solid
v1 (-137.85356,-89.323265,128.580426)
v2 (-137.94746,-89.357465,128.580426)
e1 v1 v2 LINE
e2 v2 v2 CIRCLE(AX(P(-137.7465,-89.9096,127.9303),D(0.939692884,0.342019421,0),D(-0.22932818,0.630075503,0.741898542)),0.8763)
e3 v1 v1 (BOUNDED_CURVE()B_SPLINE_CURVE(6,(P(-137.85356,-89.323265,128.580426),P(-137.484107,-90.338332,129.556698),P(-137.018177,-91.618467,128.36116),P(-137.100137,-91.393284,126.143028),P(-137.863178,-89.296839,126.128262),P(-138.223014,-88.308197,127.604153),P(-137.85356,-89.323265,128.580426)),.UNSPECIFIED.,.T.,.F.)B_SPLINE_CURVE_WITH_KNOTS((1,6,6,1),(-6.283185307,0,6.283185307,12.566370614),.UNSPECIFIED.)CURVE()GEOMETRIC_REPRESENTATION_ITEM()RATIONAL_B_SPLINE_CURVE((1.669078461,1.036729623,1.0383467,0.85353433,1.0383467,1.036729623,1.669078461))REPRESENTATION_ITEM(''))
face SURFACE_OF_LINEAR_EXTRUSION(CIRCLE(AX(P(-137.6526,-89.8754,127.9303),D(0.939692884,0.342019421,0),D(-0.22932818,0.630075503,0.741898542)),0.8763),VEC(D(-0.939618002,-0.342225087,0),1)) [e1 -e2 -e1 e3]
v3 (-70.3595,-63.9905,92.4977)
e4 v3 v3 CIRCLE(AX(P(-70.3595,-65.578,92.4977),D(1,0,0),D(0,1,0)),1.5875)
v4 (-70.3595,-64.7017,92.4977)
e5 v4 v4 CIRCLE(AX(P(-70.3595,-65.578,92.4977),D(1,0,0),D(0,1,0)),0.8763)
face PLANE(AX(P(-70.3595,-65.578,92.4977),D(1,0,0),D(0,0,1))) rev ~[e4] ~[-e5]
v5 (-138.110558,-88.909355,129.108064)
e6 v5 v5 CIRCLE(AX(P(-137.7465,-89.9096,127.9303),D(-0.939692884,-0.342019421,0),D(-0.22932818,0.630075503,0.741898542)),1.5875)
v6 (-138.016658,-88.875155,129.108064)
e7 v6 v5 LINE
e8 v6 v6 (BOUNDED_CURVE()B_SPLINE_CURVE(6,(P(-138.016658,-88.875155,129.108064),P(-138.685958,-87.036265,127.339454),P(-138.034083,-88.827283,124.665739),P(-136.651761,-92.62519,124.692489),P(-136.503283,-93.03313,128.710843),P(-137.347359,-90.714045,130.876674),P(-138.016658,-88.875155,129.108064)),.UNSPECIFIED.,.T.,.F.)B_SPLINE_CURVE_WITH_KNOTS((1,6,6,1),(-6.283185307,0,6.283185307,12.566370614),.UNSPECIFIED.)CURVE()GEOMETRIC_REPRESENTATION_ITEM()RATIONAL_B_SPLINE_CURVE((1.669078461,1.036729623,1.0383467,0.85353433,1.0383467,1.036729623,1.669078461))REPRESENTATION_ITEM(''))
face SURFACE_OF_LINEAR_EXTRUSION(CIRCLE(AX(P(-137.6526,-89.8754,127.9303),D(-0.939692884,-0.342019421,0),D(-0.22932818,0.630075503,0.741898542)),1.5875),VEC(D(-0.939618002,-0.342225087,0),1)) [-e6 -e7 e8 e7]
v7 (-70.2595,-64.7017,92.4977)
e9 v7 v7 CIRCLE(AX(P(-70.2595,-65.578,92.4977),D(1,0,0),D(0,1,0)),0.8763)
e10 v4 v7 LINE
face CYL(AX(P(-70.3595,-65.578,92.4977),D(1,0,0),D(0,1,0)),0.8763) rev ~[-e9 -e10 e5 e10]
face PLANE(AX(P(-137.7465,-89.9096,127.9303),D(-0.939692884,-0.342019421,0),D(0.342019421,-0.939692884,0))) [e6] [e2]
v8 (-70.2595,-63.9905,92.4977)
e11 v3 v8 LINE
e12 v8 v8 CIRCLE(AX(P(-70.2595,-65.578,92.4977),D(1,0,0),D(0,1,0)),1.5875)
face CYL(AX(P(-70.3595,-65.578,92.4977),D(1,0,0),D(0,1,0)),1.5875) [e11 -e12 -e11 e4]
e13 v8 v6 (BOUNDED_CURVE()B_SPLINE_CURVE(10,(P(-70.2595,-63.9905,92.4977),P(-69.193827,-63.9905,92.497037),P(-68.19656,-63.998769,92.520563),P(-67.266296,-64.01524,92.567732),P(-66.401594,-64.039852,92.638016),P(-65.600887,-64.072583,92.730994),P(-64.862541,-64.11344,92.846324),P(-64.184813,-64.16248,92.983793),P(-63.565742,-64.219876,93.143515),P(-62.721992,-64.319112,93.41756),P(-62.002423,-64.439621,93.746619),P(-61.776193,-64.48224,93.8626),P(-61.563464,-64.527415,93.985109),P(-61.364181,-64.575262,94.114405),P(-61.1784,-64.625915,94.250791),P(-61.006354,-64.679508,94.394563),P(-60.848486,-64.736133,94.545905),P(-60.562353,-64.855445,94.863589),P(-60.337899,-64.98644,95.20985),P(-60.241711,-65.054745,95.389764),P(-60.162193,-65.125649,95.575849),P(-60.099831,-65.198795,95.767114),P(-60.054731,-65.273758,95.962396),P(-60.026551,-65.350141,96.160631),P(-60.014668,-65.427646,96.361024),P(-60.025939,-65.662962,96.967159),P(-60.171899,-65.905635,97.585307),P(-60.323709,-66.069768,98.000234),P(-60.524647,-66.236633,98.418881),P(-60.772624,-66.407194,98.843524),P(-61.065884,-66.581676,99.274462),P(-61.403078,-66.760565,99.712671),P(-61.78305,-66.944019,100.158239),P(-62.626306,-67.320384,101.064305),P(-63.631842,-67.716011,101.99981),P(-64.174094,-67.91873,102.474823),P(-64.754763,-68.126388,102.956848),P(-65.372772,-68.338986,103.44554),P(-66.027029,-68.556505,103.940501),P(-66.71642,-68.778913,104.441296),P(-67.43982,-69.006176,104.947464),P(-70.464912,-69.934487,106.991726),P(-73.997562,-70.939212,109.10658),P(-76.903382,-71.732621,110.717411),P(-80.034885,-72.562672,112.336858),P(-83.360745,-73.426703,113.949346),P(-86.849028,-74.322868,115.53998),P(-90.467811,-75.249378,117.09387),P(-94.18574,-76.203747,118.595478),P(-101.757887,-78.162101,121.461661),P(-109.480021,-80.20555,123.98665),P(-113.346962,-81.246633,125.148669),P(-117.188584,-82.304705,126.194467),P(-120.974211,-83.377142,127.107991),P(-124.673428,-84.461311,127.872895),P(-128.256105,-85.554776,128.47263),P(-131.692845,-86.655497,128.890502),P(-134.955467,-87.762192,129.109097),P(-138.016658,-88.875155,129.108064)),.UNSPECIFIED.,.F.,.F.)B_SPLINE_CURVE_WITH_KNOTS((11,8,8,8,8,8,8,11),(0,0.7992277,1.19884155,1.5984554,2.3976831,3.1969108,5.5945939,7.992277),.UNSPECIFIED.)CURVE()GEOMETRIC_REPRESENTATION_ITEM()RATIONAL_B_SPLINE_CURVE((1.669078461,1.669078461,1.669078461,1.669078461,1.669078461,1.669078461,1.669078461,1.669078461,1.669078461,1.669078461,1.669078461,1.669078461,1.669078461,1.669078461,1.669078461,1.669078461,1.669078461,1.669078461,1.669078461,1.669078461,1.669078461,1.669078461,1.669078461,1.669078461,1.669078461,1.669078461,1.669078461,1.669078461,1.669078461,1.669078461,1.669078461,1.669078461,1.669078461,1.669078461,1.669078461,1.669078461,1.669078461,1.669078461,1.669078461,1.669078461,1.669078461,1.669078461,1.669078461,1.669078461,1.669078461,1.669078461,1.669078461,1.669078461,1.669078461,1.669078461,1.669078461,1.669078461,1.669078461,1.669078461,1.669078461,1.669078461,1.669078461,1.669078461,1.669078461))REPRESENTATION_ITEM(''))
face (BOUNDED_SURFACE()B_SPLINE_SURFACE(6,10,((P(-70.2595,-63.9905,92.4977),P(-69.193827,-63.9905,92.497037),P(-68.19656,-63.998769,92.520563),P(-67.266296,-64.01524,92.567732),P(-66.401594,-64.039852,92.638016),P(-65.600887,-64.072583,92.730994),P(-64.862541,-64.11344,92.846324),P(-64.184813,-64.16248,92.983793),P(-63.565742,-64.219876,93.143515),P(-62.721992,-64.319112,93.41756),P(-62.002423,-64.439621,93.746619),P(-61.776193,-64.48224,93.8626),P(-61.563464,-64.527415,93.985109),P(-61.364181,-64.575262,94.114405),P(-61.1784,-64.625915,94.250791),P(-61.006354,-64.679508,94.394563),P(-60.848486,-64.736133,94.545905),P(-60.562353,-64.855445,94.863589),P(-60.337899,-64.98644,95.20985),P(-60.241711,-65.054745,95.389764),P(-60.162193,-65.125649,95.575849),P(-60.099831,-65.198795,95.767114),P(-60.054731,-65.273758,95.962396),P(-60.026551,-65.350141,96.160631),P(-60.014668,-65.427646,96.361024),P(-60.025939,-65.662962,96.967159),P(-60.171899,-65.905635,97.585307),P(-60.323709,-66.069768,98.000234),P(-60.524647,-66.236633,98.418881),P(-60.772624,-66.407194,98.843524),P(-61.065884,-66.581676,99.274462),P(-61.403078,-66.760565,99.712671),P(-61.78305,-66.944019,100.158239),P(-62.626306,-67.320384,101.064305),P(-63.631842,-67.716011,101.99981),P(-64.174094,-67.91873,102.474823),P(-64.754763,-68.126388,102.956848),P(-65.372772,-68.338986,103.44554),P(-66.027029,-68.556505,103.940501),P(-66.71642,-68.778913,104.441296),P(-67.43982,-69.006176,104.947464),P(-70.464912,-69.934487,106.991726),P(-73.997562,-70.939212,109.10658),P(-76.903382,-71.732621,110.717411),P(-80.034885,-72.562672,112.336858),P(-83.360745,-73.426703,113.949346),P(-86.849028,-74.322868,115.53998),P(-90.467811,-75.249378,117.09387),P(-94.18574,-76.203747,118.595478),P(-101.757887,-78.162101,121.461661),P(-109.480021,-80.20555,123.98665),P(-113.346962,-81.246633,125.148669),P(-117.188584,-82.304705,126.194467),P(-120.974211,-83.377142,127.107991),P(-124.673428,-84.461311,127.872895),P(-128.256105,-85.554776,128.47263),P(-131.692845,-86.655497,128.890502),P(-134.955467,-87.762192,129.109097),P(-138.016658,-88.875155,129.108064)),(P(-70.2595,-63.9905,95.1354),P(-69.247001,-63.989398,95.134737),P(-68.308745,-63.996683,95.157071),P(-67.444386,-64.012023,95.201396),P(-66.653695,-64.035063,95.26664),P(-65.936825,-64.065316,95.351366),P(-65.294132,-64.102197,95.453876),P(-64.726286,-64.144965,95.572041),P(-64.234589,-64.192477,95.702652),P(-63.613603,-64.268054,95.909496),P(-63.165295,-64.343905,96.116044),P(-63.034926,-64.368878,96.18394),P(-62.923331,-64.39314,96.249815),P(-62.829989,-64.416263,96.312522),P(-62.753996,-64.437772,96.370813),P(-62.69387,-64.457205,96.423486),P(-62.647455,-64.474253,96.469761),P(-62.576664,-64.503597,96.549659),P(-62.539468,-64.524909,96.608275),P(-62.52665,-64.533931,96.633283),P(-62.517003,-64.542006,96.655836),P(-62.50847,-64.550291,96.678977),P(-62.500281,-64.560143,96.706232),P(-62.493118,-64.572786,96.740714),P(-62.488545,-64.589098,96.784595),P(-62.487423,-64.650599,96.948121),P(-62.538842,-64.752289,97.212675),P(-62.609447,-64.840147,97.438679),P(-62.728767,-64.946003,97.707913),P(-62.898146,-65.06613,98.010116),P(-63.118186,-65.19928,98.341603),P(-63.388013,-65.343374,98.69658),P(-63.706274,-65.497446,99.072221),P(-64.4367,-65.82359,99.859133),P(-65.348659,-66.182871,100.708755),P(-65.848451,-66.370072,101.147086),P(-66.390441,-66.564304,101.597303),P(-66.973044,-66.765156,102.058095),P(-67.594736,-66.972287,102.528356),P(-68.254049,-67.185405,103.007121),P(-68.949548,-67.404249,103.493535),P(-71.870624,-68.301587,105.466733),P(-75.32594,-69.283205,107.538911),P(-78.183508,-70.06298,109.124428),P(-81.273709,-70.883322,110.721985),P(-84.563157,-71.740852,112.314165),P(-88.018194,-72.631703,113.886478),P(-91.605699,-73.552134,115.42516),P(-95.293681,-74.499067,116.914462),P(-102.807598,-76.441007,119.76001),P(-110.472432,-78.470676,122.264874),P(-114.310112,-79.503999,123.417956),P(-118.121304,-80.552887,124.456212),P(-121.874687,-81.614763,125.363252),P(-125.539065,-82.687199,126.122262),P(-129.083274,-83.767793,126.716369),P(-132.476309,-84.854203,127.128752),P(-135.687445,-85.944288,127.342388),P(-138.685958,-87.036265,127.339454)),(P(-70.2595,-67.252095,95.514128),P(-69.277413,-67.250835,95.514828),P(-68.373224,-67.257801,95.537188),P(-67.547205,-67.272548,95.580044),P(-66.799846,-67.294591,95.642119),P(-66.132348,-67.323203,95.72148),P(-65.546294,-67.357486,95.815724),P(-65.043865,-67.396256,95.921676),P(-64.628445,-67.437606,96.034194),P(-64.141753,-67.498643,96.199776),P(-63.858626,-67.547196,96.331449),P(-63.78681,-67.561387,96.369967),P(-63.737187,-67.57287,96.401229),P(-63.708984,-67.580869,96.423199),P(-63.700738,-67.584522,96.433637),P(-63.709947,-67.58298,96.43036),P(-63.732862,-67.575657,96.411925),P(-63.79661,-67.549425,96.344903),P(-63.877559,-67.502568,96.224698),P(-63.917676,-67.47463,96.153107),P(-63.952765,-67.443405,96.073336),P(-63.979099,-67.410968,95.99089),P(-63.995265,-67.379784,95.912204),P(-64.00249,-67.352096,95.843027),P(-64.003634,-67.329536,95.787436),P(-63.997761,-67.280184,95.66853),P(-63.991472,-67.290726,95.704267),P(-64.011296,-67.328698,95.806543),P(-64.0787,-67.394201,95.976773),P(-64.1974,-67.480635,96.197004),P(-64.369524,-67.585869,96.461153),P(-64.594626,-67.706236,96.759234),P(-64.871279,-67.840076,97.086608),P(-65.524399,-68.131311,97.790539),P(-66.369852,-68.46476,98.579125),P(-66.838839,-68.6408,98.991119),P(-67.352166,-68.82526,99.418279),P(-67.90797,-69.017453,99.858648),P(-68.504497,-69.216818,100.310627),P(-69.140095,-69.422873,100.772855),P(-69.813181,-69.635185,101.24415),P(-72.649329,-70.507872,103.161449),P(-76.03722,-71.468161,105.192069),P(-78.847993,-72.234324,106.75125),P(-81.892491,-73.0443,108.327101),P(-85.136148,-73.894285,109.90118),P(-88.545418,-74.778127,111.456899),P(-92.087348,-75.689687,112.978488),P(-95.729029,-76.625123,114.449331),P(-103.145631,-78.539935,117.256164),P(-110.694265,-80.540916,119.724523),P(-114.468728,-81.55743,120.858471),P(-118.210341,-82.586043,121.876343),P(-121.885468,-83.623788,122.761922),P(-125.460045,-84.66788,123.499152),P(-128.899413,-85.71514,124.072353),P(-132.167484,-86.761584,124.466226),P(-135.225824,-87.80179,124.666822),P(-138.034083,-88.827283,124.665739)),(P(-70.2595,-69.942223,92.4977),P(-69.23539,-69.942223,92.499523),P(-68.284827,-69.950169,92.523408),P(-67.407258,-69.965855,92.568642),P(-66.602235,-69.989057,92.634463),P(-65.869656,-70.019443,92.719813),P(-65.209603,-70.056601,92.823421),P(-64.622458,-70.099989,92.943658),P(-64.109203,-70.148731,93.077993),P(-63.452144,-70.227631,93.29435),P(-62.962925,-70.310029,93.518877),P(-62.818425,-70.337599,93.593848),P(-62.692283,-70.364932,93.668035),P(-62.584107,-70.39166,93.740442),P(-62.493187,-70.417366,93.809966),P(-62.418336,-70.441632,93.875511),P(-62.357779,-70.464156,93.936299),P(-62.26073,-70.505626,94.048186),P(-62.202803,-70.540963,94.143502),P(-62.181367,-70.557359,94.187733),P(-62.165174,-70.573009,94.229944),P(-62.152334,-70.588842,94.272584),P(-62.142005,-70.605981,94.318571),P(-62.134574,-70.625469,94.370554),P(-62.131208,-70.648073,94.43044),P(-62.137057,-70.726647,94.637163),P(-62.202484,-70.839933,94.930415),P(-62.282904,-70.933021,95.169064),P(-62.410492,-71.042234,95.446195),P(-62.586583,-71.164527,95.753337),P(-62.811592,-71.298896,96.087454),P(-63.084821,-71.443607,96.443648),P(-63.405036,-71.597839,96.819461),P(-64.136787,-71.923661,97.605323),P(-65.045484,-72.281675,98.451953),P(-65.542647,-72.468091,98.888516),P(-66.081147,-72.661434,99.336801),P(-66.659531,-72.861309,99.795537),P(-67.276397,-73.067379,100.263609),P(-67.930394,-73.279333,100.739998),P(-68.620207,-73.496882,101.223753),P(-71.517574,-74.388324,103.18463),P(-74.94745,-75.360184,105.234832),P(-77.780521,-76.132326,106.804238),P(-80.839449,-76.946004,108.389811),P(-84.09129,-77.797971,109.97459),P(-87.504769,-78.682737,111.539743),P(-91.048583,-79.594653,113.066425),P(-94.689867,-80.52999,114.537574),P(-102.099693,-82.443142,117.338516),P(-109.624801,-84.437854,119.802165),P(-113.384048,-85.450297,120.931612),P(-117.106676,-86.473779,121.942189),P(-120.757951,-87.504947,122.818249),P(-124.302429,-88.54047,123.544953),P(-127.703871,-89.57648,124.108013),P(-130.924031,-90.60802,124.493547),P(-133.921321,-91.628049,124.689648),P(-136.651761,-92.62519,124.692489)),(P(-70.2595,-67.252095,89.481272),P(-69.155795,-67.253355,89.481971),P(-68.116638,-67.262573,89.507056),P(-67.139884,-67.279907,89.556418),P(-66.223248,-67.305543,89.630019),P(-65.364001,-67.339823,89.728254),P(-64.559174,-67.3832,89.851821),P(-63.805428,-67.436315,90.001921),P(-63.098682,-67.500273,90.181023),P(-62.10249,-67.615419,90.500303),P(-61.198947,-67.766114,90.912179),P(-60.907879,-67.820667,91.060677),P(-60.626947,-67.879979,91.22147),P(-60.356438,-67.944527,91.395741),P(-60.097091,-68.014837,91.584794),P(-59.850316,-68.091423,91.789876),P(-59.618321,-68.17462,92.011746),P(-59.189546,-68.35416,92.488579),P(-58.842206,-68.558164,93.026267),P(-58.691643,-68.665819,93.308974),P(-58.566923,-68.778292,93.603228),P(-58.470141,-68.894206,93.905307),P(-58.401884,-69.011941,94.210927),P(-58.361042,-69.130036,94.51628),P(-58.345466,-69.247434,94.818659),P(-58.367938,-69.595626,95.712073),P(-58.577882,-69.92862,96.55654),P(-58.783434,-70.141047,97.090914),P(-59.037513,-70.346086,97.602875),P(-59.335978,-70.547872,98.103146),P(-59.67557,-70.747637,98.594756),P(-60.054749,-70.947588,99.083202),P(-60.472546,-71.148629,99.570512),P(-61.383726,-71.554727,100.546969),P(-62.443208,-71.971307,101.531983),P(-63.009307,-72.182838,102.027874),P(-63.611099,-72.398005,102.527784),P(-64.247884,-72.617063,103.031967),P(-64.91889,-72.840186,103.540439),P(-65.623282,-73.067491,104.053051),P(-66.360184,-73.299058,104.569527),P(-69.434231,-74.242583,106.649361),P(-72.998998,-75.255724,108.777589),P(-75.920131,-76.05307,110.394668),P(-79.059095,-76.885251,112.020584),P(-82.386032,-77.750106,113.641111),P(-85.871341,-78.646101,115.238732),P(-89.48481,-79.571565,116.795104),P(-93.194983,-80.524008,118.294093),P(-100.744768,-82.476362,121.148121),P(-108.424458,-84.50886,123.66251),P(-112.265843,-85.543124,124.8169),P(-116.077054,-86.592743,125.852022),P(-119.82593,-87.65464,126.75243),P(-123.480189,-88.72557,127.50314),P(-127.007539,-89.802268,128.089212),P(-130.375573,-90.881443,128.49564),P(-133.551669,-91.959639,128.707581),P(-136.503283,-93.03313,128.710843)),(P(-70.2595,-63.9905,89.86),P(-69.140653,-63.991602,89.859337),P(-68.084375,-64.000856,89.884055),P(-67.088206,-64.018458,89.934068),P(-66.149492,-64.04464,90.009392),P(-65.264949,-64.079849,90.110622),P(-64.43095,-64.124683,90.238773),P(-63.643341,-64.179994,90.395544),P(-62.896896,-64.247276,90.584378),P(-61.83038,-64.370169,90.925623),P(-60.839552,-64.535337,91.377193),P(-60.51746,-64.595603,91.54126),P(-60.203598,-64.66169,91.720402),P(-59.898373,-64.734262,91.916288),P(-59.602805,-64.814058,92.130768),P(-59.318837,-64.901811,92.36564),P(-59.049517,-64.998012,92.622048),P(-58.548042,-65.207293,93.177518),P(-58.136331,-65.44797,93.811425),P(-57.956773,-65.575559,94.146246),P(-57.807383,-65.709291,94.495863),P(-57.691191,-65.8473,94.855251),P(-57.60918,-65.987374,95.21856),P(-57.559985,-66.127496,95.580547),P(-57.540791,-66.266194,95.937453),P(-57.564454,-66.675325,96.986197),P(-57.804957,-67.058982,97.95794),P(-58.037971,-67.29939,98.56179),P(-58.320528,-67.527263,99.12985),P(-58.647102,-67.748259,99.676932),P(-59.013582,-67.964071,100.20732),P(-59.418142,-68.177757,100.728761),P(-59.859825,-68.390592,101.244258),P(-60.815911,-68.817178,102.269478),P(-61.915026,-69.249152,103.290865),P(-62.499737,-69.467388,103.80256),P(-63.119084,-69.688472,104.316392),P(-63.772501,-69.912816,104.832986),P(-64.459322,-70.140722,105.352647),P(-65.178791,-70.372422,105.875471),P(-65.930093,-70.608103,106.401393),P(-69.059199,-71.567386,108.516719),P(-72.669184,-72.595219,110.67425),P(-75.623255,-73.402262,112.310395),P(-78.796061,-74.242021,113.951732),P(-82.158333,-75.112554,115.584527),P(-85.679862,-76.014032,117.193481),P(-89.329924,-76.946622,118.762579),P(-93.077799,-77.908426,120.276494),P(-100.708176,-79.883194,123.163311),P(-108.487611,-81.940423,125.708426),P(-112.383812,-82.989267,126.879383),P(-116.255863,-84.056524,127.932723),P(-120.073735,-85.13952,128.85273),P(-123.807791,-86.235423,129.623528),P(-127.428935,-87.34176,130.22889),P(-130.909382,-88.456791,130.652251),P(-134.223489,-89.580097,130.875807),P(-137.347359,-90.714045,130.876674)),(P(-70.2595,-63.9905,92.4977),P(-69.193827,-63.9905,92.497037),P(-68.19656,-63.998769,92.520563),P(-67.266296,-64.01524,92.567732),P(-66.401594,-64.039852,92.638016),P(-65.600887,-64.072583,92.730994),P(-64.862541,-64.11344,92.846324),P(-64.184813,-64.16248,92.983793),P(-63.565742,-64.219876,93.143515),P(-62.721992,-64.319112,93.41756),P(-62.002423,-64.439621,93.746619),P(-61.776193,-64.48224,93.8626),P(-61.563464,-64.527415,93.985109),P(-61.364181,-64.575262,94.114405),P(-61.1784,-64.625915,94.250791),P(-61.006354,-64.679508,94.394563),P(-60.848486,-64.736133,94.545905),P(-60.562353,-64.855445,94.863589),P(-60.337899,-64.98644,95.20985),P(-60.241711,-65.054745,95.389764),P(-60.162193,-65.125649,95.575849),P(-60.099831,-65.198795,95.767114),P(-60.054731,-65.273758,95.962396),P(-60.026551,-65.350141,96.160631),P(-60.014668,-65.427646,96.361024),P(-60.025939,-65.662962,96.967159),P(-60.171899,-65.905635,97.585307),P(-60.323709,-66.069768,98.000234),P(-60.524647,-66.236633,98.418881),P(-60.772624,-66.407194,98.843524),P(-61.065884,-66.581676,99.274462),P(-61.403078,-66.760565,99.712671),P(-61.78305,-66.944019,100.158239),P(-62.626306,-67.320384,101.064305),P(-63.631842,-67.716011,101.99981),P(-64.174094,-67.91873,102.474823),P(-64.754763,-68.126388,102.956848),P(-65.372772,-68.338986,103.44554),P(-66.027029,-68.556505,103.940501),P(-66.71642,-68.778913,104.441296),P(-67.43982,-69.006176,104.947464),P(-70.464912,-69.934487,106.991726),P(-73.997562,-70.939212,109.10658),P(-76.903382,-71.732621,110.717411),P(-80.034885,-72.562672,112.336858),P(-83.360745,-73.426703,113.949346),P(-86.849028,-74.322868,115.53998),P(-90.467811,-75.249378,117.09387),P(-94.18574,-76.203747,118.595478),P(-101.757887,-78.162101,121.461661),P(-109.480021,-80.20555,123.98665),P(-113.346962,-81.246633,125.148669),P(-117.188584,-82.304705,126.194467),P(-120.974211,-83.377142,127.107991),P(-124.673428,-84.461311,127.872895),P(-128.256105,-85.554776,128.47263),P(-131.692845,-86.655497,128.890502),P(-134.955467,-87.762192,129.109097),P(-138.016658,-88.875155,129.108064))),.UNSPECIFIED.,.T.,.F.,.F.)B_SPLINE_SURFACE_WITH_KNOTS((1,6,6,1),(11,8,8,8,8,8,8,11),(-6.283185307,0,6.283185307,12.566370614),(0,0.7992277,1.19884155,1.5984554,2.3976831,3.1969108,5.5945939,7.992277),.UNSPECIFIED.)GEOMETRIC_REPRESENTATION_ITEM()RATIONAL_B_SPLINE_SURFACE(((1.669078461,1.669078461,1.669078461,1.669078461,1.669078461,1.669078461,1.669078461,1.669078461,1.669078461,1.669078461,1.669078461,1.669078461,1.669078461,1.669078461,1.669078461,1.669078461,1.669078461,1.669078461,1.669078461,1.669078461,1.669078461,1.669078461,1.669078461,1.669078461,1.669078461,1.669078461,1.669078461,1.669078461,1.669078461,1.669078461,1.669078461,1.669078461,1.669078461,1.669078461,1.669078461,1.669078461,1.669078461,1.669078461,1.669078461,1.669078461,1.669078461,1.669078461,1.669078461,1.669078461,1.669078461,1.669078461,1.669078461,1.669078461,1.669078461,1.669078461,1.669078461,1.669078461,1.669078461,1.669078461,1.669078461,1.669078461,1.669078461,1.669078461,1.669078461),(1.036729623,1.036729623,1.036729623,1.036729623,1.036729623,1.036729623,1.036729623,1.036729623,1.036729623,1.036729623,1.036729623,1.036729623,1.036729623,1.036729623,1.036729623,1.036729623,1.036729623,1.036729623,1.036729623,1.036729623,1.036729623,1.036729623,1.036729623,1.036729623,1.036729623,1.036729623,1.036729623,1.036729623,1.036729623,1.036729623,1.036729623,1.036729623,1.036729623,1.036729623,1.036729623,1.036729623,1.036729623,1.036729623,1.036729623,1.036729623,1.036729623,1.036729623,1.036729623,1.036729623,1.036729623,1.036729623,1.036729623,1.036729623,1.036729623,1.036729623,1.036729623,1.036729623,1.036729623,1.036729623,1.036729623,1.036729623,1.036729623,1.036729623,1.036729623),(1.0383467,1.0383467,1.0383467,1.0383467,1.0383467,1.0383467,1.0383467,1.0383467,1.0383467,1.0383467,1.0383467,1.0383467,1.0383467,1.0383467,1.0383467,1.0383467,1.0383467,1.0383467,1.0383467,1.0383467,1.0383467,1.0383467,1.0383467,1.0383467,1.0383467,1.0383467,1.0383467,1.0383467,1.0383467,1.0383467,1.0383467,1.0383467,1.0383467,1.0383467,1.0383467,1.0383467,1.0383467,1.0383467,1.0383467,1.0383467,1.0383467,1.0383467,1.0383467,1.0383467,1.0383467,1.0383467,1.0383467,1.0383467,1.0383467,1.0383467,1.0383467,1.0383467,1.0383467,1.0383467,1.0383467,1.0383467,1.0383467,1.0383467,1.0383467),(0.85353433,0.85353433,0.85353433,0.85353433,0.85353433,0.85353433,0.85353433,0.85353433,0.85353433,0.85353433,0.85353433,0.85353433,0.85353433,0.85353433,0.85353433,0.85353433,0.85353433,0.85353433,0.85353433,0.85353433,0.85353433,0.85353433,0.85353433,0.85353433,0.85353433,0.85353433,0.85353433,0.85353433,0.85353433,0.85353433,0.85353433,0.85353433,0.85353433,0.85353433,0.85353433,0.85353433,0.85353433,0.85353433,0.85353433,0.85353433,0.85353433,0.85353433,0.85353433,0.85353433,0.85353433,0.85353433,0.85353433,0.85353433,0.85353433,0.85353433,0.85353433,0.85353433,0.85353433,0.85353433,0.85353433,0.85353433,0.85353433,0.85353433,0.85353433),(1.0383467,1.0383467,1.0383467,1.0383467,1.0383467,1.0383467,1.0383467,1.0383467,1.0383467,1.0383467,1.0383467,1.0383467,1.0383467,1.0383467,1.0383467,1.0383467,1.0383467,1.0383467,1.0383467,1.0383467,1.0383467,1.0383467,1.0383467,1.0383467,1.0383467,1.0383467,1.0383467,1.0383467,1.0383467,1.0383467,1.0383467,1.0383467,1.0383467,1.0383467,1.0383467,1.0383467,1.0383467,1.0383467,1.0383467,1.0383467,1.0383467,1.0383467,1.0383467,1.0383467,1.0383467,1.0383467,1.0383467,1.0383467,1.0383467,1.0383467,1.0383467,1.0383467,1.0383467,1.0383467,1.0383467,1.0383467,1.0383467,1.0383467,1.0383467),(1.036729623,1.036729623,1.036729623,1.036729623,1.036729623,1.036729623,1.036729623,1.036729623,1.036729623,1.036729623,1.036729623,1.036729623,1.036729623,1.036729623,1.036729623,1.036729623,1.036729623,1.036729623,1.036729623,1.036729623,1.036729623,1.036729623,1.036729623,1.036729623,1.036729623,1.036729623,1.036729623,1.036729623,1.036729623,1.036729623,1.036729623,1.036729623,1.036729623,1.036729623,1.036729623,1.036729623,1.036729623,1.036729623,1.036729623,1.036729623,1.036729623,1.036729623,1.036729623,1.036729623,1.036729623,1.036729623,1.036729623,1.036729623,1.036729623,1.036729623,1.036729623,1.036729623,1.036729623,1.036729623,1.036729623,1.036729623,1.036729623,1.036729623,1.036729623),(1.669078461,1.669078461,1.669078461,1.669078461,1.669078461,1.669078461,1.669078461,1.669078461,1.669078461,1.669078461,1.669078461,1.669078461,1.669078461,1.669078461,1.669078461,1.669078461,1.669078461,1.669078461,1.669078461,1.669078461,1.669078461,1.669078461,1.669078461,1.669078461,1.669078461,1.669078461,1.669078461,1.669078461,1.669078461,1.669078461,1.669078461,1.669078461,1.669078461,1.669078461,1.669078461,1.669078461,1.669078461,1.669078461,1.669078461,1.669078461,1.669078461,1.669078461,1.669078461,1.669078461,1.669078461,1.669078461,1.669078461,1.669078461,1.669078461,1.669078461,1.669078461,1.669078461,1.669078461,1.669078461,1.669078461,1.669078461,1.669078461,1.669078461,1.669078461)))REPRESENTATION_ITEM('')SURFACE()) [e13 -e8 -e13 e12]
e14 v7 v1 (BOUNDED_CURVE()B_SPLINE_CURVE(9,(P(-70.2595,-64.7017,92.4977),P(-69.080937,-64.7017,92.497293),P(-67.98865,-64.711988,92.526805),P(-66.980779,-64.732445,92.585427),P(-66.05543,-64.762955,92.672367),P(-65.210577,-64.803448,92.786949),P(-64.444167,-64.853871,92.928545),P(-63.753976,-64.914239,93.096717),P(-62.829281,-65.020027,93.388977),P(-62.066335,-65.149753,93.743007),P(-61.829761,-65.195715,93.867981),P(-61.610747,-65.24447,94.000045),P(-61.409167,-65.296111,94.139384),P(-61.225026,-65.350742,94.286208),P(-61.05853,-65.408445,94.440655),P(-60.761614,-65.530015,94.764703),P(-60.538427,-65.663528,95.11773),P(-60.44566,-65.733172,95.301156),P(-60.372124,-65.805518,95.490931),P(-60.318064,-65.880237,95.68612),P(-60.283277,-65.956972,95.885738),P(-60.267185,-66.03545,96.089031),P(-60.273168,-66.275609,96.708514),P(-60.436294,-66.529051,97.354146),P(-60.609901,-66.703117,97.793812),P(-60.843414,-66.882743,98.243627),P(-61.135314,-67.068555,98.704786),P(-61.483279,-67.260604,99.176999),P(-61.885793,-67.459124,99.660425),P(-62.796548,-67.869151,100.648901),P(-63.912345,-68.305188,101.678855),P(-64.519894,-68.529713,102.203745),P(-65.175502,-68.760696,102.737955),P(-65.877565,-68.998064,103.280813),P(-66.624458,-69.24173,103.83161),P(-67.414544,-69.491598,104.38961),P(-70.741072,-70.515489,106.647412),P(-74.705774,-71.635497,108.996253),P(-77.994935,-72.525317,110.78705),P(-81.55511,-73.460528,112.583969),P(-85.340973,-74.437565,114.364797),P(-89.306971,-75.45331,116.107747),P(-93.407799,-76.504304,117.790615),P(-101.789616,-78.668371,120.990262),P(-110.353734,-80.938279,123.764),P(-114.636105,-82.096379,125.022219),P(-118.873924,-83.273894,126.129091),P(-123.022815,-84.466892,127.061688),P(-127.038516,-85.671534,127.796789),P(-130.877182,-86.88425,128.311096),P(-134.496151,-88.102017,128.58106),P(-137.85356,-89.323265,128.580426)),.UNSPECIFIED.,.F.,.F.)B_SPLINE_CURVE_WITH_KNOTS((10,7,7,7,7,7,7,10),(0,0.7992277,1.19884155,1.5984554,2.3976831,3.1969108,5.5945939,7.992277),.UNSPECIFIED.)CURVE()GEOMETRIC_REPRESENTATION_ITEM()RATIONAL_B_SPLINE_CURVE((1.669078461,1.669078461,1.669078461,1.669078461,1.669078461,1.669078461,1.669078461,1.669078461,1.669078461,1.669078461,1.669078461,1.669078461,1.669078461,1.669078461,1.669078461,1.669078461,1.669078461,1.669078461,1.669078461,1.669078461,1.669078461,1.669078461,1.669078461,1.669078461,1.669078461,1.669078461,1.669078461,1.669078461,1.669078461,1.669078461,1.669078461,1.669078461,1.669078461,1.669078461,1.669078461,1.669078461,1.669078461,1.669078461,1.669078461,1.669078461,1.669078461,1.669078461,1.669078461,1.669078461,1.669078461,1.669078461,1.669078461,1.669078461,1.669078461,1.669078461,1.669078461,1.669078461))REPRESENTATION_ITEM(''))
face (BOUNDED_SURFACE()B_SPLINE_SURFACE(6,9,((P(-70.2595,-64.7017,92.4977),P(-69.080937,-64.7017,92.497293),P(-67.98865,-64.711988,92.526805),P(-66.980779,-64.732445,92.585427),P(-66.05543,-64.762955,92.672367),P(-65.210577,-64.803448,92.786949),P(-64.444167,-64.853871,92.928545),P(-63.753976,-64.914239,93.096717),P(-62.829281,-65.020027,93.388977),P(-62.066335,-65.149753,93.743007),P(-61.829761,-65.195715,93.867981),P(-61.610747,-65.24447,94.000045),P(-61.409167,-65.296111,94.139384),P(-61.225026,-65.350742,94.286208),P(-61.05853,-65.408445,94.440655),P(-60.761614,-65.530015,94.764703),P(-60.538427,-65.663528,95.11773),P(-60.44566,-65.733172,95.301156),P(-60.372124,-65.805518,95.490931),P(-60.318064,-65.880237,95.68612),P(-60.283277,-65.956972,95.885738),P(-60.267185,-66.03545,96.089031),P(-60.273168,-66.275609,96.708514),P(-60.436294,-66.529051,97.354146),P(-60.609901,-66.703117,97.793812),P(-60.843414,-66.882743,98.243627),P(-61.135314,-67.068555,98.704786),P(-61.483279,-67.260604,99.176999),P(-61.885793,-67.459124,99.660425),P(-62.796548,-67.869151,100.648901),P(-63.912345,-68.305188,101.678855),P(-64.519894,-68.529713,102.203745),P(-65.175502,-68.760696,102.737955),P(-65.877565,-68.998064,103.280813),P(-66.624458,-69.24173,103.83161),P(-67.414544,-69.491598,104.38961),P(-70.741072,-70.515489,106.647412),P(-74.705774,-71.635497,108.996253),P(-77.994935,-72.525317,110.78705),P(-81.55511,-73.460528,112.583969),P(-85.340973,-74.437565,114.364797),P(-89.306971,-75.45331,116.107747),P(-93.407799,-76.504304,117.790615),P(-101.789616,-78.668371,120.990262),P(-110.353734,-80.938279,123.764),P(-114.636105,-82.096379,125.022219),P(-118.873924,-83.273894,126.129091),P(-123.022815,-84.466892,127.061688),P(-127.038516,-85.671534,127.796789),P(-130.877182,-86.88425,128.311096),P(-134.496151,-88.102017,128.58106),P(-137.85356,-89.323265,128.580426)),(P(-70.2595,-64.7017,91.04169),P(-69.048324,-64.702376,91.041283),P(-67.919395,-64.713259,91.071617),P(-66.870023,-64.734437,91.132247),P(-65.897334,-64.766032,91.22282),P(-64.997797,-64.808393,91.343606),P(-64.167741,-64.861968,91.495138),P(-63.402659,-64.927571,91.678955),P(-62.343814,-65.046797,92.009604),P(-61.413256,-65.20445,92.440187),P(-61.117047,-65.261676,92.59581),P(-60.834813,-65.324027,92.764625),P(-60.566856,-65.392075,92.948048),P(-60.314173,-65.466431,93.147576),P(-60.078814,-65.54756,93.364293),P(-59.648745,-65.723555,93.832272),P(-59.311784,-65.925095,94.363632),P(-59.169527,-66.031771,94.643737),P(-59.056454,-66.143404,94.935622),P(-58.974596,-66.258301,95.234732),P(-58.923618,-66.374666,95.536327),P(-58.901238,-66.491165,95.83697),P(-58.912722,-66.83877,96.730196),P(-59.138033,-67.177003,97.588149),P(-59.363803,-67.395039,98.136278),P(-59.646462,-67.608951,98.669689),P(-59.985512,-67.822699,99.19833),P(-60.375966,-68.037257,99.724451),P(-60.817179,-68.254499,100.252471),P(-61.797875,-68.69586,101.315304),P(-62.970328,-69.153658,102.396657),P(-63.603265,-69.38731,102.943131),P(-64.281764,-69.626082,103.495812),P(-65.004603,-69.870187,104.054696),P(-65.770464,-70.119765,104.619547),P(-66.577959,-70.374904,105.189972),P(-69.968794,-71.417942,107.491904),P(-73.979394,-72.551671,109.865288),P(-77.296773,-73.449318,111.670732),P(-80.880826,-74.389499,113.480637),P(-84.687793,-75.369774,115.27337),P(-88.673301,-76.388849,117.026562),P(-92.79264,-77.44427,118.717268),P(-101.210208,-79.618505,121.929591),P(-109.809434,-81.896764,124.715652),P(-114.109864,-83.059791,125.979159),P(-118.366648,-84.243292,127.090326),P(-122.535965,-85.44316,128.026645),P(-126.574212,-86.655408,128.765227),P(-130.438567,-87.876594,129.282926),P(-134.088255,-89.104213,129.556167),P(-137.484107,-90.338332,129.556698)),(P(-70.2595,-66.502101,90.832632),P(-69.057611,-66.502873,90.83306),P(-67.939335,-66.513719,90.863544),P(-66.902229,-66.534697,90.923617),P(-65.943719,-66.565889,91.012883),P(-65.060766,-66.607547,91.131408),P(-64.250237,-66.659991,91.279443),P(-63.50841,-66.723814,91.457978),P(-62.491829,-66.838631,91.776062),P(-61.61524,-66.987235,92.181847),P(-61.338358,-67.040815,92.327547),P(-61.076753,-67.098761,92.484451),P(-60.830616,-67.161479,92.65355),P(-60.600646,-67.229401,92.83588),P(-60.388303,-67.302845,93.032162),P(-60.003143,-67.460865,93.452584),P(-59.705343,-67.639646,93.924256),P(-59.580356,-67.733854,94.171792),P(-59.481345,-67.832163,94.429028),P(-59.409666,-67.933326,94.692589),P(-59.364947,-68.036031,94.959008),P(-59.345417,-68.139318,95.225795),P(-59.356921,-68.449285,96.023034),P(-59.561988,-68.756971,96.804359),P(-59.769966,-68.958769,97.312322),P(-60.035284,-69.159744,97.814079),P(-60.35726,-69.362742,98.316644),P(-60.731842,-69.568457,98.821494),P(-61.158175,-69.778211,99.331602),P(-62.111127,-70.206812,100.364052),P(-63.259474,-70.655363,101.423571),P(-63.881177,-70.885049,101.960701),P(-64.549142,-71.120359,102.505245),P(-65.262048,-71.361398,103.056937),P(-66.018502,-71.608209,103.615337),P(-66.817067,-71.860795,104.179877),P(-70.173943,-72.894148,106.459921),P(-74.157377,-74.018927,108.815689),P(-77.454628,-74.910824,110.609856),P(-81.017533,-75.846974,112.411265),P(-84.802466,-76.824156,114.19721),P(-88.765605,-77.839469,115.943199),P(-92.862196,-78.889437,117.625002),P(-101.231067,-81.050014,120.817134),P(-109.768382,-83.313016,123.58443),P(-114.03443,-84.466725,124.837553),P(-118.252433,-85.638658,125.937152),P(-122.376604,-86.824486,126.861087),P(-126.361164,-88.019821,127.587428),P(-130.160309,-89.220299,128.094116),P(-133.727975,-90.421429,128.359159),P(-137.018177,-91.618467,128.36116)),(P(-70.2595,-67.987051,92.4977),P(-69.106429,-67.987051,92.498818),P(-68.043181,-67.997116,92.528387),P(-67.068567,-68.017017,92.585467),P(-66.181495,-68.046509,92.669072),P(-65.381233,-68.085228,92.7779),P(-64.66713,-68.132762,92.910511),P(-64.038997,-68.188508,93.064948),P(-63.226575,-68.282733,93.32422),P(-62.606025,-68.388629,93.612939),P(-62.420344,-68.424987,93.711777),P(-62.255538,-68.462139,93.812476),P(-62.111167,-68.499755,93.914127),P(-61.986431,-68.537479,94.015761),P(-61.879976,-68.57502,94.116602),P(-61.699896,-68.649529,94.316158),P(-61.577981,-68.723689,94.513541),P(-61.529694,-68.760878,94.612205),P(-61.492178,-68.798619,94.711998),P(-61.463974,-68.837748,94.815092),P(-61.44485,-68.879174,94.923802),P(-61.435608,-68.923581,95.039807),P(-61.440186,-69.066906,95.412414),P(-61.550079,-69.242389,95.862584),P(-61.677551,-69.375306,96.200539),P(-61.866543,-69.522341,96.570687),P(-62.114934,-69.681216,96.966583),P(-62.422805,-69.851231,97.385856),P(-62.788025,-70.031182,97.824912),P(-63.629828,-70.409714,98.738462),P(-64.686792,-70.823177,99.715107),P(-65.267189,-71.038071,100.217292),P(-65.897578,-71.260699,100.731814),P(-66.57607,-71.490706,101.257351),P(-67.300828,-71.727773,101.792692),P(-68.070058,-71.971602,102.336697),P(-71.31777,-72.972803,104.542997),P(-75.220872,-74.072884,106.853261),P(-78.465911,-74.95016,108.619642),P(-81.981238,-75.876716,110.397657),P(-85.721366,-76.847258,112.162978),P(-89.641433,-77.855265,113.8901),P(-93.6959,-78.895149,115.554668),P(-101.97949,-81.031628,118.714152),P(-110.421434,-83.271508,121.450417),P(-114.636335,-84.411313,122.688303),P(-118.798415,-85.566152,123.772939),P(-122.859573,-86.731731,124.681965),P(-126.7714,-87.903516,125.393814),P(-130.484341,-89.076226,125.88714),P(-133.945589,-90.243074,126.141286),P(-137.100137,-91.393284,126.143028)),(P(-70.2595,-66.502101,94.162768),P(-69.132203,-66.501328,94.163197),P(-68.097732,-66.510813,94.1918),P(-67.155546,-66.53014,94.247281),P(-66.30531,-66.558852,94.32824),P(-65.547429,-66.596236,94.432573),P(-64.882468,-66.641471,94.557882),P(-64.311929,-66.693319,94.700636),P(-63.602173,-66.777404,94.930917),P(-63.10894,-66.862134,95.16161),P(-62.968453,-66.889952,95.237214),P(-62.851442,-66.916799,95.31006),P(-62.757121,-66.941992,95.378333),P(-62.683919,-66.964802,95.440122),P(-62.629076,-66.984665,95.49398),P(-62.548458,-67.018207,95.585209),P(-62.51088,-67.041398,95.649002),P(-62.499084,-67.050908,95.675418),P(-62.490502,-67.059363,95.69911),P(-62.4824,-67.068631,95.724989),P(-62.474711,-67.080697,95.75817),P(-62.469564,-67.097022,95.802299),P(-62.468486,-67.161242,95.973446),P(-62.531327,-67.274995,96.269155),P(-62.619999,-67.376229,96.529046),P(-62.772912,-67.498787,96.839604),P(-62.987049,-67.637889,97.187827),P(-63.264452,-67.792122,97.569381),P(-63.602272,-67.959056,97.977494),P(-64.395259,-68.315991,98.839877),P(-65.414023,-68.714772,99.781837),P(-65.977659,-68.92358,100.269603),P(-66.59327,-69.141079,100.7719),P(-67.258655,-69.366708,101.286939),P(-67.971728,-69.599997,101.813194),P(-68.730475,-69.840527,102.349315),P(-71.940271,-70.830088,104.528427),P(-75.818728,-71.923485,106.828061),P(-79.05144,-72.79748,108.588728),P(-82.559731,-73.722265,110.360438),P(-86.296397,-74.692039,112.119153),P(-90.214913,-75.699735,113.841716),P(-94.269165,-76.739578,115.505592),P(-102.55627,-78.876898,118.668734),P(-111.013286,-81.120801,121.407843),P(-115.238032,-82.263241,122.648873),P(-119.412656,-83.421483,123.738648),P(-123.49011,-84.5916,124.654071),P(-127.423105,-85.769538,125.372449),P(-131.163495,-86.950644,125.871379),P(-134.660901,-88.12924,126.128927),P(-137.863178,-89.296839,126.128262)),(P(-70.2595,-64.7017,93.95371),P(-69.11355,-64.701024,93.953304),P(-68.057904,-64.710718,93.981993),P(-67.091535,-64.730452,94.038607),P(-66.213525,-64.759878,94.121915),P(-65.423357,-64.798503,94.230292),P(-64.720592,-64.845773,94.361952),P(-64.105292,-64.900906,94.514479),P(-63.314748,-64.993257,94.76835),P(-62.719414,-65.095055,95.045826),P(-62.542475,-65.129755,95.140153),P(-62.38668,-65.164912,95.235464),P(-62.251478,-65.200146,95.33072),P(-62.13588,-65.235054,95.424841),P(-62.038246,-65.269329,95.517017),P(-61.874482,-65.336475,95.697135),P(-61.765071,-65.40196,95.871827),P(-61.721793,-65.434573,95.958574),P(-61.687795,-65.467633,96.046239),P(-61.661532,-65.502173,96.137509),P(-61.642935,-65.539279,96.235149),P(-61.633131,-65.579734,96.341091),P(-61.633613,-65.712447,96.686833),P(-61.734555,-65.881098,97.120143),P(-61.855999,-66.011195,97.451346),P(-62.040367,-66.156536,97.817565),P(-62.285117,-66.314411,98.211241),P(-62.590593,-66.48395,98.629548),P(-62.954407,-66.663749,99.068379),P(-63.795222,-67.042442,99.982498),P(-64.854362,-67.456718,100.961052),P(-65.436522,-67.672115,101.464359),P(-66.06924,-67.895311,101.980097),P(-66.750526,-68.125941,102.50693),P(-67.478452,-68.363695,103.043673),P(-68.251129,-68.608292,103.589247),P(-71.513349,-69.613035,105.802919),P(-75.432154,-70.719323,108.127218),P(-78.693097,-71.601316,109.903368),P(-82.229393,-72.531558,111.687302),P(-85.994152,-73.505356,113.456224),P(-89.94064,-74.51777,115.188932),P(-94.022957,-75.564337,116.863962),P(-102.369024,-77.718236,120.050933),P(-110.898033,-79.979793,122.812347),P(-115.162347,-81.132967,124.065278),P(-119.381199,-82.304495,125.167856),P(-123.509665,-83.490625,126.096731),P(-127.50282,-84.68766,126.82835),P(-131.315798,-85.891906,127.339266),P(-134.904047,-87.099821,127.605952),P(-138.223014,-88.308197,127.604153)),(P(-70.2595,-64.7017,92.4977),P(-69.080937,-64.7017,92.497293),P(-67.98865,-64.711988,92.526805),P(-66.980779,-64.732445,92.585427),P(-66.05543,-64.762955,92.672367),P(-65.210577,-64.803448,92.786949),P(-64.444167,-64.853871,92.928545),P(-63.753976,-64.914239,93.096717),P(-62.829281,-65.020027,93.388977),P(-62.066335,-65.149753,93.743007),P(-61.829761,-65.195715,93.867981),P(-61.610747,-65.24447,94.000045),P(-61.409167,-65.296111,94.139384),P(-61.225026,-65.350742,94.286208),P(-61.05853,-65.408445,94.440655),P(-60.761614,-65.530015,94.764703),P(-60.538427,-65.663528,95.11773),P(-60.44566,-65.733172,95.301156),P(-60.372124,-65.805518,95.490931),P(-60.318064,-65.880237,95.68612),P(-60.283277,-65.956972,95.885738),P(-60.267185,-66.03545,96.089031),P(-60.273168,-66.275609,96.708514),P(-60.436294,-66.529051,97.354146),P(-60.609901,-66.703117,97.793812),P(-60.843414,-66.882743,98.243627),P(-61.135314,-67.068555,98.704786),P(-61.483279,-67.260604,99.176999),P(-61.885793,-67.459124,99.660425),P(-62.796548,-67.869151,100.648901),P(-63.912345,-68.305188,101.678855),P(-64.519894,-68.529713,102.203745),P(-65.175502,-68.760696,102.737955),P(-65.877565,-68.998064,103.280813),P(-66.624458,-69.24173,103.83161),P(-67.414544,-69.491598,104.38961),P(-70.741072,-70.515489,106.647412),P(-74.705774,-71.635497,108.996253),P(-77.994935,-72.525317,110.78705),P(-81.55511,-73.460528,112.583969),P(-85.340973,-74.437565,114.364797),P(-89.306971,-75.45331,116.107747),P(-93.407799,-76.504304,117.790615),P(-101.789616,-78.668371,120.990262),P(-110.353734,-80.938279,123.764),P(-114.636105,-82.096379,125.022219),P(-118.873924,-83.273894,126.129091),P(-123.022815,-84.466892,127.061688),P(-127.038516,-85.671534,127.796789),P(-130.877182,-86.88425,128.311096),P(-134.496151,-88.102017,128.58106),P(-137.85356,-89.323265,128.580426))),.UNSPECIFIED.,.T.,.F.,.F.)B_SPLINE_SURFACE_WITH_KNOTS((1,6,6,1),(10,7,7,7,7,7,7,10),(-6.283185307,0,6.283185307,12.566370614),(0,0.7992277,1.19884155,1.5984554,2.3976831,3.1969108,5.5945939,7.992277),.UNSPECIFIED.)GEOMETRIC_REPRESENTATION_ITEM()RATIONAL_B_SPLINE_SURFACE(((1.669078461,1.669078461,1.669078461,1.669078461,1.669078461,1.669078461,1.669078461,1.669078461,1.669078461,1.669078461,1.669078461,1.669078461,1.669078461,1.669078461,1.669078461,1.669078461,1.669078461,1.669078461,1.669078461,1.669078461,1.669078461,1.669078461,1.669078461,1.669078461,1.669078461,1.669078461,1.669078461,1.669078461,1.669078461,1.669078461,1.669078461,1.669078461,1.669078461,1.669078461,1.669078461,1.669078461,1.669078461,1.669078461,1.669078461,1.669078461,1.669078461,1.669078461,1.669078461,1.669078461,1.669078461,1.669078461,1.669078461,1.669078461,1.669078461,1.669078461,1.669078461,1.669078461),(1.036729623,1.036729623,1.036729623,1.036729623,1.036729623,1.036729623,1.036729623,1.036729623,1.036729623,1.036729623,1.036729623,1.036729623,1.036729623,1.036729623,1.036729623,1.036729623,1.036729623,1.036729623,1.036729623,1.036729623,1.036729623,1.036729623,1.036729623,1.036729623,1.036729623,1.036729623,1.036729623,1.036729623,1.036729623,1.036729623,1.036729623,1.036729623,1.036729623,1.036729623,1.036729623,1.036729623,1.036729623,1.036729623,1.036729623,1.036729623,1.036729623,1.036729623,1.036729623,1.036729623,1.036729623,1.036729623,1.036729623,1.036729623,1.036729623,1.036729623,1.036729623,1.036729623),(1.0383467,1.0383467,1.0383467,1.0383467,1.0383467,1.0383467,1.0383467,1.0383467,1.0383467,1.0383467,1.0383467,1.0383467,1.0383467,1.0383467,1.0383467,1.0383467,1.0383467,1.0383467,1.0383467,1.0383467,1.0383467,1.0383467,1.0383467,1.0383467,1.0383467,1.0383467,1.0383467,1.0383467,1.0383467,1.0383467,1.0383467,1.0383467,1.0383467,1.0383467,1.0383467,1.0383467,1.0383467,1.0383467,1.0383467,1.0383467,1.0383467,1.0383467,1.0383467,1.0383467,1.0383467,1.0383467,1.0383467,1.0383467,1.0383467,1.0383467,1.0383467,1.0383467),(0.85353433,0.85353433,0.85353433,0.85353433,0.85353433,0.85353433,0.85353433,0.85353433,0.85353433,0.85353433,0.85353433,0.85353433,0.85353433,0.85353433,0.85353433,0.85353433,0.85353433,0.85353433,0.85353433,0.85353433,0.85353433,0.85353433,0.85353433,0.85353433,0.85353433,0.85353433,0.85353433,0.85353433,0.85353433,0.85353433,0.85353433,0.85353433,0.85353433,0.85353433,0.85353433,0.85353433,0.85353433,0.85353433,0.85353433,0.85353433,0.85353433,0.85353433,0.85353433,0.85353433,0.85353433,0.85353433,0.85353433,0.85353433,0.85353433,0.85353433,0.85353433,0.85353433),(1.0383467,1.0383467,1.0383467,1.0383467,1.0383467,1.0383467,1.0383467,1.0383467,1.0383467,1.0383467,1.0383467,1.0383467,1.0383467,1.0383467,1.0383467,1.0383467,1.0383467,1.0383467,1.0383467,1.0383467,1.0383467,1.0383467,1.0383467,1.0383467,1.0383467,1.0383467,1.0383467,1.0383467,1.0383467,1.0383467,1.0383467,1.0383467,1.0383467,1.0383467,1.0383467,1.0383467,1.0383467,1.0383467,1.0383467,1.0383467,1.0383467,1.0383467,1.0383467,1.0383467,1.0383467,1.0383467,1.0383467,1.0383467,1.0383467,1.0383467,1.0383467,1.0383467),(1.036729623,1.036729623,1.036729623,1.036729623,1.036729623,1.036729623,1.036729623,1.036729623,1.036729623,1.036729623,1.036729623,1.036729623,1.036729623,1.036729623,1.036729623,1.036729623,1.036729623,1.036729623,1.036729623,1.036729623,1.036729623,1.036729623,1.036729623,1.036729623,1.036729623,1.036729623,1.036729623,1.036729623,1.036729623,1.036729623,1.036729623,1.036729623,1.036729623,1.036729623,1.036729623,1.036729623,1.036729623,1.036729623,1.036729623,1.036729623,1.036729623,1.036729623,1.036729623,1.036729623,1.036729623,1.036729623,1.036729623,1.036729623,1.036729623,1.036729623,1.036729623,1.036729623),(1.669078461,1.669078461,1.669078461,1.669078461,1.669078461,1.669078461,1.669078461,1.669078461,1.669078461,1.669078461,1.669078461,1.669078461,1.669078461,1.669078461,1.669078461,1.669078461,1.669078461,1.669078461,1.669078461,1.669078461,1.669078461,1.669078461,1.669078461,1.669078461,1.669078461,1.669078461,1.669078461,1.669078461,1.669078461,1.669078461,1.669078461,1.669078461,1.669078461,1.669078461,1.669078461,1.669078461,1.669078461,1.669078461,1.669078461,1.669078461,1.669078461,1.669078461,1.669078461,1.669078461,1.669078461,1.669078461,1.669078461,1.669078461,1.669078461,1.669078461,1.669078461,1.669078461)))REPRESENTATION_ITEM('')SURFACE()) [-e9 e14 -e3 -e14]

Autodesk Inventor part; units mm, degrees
ref_plane "YZ Plane" through (0, 0, 0) normal (1, 0, 0) x (0, 1, 0)
ref_plane "XZ Plane" through (0, 0, 0) normal (0, 1, 0) x (-1, 0, 0)
ref_plane "XY Plane" through (0, 0, 0) normal (0, 0, 1) x (1, 0, 0)
ref_plane "Work Plane3" through (-70.2595, -65.578, 92.4977) normal (1, 0, 0) x (0, 1, 0)
sketch "Sketch3" plane through (-70.2595, -65.578, 92.4977) normal (1, 0, 0) x (0, 1, 0)
  circle A0 centre (0, 0) radius 1.5875
  circle A1 centre (0, 0) radius 0.8763
  point P0 (-5.3806, 13.1006)
sketch3d "3D Sketch1"
  line L0 (-70.3595, -65.578, 92.4977) -> (-70.2595, -65.578, 92.4977)
  spline S0 degree 3 poles (-70.2595, -65.578, 92.4977) (-35.1066, -65.578, 92.4977) (-104.6196, -77.8524, 127.9303) (-137.6526, -89.8754, 127.9303) knots 0 0 0 0 7.992277 7.992277 7.992277 7.992277
  line L1 (-137.6526, -89.8754, 127.9303) -> (-137.7465, -89.9096, 127.9303)
  dimension "d56" = -1.3195
  dimension "d57" = 1.3195
sweep "Sweep1" add profiles "Sketch3" path "3D Sketch1"
equation "\"OD\" = 3.175"
equation "\"t\" = 0.7112"
equation "\"L\" = PL"
equation "\"ID\" = 1.7526"
equation "\"PL\" = 100.0506"
equation "\"D\" = 12.7"
equation "\"Size_Designation\" = 1.2345"
equation "\"RPL\" = 101.6"
equation "\"OPL\" = 100.0506"
equation "\"ROPL\" = 101.6"
properties material "PVC-Piping"
